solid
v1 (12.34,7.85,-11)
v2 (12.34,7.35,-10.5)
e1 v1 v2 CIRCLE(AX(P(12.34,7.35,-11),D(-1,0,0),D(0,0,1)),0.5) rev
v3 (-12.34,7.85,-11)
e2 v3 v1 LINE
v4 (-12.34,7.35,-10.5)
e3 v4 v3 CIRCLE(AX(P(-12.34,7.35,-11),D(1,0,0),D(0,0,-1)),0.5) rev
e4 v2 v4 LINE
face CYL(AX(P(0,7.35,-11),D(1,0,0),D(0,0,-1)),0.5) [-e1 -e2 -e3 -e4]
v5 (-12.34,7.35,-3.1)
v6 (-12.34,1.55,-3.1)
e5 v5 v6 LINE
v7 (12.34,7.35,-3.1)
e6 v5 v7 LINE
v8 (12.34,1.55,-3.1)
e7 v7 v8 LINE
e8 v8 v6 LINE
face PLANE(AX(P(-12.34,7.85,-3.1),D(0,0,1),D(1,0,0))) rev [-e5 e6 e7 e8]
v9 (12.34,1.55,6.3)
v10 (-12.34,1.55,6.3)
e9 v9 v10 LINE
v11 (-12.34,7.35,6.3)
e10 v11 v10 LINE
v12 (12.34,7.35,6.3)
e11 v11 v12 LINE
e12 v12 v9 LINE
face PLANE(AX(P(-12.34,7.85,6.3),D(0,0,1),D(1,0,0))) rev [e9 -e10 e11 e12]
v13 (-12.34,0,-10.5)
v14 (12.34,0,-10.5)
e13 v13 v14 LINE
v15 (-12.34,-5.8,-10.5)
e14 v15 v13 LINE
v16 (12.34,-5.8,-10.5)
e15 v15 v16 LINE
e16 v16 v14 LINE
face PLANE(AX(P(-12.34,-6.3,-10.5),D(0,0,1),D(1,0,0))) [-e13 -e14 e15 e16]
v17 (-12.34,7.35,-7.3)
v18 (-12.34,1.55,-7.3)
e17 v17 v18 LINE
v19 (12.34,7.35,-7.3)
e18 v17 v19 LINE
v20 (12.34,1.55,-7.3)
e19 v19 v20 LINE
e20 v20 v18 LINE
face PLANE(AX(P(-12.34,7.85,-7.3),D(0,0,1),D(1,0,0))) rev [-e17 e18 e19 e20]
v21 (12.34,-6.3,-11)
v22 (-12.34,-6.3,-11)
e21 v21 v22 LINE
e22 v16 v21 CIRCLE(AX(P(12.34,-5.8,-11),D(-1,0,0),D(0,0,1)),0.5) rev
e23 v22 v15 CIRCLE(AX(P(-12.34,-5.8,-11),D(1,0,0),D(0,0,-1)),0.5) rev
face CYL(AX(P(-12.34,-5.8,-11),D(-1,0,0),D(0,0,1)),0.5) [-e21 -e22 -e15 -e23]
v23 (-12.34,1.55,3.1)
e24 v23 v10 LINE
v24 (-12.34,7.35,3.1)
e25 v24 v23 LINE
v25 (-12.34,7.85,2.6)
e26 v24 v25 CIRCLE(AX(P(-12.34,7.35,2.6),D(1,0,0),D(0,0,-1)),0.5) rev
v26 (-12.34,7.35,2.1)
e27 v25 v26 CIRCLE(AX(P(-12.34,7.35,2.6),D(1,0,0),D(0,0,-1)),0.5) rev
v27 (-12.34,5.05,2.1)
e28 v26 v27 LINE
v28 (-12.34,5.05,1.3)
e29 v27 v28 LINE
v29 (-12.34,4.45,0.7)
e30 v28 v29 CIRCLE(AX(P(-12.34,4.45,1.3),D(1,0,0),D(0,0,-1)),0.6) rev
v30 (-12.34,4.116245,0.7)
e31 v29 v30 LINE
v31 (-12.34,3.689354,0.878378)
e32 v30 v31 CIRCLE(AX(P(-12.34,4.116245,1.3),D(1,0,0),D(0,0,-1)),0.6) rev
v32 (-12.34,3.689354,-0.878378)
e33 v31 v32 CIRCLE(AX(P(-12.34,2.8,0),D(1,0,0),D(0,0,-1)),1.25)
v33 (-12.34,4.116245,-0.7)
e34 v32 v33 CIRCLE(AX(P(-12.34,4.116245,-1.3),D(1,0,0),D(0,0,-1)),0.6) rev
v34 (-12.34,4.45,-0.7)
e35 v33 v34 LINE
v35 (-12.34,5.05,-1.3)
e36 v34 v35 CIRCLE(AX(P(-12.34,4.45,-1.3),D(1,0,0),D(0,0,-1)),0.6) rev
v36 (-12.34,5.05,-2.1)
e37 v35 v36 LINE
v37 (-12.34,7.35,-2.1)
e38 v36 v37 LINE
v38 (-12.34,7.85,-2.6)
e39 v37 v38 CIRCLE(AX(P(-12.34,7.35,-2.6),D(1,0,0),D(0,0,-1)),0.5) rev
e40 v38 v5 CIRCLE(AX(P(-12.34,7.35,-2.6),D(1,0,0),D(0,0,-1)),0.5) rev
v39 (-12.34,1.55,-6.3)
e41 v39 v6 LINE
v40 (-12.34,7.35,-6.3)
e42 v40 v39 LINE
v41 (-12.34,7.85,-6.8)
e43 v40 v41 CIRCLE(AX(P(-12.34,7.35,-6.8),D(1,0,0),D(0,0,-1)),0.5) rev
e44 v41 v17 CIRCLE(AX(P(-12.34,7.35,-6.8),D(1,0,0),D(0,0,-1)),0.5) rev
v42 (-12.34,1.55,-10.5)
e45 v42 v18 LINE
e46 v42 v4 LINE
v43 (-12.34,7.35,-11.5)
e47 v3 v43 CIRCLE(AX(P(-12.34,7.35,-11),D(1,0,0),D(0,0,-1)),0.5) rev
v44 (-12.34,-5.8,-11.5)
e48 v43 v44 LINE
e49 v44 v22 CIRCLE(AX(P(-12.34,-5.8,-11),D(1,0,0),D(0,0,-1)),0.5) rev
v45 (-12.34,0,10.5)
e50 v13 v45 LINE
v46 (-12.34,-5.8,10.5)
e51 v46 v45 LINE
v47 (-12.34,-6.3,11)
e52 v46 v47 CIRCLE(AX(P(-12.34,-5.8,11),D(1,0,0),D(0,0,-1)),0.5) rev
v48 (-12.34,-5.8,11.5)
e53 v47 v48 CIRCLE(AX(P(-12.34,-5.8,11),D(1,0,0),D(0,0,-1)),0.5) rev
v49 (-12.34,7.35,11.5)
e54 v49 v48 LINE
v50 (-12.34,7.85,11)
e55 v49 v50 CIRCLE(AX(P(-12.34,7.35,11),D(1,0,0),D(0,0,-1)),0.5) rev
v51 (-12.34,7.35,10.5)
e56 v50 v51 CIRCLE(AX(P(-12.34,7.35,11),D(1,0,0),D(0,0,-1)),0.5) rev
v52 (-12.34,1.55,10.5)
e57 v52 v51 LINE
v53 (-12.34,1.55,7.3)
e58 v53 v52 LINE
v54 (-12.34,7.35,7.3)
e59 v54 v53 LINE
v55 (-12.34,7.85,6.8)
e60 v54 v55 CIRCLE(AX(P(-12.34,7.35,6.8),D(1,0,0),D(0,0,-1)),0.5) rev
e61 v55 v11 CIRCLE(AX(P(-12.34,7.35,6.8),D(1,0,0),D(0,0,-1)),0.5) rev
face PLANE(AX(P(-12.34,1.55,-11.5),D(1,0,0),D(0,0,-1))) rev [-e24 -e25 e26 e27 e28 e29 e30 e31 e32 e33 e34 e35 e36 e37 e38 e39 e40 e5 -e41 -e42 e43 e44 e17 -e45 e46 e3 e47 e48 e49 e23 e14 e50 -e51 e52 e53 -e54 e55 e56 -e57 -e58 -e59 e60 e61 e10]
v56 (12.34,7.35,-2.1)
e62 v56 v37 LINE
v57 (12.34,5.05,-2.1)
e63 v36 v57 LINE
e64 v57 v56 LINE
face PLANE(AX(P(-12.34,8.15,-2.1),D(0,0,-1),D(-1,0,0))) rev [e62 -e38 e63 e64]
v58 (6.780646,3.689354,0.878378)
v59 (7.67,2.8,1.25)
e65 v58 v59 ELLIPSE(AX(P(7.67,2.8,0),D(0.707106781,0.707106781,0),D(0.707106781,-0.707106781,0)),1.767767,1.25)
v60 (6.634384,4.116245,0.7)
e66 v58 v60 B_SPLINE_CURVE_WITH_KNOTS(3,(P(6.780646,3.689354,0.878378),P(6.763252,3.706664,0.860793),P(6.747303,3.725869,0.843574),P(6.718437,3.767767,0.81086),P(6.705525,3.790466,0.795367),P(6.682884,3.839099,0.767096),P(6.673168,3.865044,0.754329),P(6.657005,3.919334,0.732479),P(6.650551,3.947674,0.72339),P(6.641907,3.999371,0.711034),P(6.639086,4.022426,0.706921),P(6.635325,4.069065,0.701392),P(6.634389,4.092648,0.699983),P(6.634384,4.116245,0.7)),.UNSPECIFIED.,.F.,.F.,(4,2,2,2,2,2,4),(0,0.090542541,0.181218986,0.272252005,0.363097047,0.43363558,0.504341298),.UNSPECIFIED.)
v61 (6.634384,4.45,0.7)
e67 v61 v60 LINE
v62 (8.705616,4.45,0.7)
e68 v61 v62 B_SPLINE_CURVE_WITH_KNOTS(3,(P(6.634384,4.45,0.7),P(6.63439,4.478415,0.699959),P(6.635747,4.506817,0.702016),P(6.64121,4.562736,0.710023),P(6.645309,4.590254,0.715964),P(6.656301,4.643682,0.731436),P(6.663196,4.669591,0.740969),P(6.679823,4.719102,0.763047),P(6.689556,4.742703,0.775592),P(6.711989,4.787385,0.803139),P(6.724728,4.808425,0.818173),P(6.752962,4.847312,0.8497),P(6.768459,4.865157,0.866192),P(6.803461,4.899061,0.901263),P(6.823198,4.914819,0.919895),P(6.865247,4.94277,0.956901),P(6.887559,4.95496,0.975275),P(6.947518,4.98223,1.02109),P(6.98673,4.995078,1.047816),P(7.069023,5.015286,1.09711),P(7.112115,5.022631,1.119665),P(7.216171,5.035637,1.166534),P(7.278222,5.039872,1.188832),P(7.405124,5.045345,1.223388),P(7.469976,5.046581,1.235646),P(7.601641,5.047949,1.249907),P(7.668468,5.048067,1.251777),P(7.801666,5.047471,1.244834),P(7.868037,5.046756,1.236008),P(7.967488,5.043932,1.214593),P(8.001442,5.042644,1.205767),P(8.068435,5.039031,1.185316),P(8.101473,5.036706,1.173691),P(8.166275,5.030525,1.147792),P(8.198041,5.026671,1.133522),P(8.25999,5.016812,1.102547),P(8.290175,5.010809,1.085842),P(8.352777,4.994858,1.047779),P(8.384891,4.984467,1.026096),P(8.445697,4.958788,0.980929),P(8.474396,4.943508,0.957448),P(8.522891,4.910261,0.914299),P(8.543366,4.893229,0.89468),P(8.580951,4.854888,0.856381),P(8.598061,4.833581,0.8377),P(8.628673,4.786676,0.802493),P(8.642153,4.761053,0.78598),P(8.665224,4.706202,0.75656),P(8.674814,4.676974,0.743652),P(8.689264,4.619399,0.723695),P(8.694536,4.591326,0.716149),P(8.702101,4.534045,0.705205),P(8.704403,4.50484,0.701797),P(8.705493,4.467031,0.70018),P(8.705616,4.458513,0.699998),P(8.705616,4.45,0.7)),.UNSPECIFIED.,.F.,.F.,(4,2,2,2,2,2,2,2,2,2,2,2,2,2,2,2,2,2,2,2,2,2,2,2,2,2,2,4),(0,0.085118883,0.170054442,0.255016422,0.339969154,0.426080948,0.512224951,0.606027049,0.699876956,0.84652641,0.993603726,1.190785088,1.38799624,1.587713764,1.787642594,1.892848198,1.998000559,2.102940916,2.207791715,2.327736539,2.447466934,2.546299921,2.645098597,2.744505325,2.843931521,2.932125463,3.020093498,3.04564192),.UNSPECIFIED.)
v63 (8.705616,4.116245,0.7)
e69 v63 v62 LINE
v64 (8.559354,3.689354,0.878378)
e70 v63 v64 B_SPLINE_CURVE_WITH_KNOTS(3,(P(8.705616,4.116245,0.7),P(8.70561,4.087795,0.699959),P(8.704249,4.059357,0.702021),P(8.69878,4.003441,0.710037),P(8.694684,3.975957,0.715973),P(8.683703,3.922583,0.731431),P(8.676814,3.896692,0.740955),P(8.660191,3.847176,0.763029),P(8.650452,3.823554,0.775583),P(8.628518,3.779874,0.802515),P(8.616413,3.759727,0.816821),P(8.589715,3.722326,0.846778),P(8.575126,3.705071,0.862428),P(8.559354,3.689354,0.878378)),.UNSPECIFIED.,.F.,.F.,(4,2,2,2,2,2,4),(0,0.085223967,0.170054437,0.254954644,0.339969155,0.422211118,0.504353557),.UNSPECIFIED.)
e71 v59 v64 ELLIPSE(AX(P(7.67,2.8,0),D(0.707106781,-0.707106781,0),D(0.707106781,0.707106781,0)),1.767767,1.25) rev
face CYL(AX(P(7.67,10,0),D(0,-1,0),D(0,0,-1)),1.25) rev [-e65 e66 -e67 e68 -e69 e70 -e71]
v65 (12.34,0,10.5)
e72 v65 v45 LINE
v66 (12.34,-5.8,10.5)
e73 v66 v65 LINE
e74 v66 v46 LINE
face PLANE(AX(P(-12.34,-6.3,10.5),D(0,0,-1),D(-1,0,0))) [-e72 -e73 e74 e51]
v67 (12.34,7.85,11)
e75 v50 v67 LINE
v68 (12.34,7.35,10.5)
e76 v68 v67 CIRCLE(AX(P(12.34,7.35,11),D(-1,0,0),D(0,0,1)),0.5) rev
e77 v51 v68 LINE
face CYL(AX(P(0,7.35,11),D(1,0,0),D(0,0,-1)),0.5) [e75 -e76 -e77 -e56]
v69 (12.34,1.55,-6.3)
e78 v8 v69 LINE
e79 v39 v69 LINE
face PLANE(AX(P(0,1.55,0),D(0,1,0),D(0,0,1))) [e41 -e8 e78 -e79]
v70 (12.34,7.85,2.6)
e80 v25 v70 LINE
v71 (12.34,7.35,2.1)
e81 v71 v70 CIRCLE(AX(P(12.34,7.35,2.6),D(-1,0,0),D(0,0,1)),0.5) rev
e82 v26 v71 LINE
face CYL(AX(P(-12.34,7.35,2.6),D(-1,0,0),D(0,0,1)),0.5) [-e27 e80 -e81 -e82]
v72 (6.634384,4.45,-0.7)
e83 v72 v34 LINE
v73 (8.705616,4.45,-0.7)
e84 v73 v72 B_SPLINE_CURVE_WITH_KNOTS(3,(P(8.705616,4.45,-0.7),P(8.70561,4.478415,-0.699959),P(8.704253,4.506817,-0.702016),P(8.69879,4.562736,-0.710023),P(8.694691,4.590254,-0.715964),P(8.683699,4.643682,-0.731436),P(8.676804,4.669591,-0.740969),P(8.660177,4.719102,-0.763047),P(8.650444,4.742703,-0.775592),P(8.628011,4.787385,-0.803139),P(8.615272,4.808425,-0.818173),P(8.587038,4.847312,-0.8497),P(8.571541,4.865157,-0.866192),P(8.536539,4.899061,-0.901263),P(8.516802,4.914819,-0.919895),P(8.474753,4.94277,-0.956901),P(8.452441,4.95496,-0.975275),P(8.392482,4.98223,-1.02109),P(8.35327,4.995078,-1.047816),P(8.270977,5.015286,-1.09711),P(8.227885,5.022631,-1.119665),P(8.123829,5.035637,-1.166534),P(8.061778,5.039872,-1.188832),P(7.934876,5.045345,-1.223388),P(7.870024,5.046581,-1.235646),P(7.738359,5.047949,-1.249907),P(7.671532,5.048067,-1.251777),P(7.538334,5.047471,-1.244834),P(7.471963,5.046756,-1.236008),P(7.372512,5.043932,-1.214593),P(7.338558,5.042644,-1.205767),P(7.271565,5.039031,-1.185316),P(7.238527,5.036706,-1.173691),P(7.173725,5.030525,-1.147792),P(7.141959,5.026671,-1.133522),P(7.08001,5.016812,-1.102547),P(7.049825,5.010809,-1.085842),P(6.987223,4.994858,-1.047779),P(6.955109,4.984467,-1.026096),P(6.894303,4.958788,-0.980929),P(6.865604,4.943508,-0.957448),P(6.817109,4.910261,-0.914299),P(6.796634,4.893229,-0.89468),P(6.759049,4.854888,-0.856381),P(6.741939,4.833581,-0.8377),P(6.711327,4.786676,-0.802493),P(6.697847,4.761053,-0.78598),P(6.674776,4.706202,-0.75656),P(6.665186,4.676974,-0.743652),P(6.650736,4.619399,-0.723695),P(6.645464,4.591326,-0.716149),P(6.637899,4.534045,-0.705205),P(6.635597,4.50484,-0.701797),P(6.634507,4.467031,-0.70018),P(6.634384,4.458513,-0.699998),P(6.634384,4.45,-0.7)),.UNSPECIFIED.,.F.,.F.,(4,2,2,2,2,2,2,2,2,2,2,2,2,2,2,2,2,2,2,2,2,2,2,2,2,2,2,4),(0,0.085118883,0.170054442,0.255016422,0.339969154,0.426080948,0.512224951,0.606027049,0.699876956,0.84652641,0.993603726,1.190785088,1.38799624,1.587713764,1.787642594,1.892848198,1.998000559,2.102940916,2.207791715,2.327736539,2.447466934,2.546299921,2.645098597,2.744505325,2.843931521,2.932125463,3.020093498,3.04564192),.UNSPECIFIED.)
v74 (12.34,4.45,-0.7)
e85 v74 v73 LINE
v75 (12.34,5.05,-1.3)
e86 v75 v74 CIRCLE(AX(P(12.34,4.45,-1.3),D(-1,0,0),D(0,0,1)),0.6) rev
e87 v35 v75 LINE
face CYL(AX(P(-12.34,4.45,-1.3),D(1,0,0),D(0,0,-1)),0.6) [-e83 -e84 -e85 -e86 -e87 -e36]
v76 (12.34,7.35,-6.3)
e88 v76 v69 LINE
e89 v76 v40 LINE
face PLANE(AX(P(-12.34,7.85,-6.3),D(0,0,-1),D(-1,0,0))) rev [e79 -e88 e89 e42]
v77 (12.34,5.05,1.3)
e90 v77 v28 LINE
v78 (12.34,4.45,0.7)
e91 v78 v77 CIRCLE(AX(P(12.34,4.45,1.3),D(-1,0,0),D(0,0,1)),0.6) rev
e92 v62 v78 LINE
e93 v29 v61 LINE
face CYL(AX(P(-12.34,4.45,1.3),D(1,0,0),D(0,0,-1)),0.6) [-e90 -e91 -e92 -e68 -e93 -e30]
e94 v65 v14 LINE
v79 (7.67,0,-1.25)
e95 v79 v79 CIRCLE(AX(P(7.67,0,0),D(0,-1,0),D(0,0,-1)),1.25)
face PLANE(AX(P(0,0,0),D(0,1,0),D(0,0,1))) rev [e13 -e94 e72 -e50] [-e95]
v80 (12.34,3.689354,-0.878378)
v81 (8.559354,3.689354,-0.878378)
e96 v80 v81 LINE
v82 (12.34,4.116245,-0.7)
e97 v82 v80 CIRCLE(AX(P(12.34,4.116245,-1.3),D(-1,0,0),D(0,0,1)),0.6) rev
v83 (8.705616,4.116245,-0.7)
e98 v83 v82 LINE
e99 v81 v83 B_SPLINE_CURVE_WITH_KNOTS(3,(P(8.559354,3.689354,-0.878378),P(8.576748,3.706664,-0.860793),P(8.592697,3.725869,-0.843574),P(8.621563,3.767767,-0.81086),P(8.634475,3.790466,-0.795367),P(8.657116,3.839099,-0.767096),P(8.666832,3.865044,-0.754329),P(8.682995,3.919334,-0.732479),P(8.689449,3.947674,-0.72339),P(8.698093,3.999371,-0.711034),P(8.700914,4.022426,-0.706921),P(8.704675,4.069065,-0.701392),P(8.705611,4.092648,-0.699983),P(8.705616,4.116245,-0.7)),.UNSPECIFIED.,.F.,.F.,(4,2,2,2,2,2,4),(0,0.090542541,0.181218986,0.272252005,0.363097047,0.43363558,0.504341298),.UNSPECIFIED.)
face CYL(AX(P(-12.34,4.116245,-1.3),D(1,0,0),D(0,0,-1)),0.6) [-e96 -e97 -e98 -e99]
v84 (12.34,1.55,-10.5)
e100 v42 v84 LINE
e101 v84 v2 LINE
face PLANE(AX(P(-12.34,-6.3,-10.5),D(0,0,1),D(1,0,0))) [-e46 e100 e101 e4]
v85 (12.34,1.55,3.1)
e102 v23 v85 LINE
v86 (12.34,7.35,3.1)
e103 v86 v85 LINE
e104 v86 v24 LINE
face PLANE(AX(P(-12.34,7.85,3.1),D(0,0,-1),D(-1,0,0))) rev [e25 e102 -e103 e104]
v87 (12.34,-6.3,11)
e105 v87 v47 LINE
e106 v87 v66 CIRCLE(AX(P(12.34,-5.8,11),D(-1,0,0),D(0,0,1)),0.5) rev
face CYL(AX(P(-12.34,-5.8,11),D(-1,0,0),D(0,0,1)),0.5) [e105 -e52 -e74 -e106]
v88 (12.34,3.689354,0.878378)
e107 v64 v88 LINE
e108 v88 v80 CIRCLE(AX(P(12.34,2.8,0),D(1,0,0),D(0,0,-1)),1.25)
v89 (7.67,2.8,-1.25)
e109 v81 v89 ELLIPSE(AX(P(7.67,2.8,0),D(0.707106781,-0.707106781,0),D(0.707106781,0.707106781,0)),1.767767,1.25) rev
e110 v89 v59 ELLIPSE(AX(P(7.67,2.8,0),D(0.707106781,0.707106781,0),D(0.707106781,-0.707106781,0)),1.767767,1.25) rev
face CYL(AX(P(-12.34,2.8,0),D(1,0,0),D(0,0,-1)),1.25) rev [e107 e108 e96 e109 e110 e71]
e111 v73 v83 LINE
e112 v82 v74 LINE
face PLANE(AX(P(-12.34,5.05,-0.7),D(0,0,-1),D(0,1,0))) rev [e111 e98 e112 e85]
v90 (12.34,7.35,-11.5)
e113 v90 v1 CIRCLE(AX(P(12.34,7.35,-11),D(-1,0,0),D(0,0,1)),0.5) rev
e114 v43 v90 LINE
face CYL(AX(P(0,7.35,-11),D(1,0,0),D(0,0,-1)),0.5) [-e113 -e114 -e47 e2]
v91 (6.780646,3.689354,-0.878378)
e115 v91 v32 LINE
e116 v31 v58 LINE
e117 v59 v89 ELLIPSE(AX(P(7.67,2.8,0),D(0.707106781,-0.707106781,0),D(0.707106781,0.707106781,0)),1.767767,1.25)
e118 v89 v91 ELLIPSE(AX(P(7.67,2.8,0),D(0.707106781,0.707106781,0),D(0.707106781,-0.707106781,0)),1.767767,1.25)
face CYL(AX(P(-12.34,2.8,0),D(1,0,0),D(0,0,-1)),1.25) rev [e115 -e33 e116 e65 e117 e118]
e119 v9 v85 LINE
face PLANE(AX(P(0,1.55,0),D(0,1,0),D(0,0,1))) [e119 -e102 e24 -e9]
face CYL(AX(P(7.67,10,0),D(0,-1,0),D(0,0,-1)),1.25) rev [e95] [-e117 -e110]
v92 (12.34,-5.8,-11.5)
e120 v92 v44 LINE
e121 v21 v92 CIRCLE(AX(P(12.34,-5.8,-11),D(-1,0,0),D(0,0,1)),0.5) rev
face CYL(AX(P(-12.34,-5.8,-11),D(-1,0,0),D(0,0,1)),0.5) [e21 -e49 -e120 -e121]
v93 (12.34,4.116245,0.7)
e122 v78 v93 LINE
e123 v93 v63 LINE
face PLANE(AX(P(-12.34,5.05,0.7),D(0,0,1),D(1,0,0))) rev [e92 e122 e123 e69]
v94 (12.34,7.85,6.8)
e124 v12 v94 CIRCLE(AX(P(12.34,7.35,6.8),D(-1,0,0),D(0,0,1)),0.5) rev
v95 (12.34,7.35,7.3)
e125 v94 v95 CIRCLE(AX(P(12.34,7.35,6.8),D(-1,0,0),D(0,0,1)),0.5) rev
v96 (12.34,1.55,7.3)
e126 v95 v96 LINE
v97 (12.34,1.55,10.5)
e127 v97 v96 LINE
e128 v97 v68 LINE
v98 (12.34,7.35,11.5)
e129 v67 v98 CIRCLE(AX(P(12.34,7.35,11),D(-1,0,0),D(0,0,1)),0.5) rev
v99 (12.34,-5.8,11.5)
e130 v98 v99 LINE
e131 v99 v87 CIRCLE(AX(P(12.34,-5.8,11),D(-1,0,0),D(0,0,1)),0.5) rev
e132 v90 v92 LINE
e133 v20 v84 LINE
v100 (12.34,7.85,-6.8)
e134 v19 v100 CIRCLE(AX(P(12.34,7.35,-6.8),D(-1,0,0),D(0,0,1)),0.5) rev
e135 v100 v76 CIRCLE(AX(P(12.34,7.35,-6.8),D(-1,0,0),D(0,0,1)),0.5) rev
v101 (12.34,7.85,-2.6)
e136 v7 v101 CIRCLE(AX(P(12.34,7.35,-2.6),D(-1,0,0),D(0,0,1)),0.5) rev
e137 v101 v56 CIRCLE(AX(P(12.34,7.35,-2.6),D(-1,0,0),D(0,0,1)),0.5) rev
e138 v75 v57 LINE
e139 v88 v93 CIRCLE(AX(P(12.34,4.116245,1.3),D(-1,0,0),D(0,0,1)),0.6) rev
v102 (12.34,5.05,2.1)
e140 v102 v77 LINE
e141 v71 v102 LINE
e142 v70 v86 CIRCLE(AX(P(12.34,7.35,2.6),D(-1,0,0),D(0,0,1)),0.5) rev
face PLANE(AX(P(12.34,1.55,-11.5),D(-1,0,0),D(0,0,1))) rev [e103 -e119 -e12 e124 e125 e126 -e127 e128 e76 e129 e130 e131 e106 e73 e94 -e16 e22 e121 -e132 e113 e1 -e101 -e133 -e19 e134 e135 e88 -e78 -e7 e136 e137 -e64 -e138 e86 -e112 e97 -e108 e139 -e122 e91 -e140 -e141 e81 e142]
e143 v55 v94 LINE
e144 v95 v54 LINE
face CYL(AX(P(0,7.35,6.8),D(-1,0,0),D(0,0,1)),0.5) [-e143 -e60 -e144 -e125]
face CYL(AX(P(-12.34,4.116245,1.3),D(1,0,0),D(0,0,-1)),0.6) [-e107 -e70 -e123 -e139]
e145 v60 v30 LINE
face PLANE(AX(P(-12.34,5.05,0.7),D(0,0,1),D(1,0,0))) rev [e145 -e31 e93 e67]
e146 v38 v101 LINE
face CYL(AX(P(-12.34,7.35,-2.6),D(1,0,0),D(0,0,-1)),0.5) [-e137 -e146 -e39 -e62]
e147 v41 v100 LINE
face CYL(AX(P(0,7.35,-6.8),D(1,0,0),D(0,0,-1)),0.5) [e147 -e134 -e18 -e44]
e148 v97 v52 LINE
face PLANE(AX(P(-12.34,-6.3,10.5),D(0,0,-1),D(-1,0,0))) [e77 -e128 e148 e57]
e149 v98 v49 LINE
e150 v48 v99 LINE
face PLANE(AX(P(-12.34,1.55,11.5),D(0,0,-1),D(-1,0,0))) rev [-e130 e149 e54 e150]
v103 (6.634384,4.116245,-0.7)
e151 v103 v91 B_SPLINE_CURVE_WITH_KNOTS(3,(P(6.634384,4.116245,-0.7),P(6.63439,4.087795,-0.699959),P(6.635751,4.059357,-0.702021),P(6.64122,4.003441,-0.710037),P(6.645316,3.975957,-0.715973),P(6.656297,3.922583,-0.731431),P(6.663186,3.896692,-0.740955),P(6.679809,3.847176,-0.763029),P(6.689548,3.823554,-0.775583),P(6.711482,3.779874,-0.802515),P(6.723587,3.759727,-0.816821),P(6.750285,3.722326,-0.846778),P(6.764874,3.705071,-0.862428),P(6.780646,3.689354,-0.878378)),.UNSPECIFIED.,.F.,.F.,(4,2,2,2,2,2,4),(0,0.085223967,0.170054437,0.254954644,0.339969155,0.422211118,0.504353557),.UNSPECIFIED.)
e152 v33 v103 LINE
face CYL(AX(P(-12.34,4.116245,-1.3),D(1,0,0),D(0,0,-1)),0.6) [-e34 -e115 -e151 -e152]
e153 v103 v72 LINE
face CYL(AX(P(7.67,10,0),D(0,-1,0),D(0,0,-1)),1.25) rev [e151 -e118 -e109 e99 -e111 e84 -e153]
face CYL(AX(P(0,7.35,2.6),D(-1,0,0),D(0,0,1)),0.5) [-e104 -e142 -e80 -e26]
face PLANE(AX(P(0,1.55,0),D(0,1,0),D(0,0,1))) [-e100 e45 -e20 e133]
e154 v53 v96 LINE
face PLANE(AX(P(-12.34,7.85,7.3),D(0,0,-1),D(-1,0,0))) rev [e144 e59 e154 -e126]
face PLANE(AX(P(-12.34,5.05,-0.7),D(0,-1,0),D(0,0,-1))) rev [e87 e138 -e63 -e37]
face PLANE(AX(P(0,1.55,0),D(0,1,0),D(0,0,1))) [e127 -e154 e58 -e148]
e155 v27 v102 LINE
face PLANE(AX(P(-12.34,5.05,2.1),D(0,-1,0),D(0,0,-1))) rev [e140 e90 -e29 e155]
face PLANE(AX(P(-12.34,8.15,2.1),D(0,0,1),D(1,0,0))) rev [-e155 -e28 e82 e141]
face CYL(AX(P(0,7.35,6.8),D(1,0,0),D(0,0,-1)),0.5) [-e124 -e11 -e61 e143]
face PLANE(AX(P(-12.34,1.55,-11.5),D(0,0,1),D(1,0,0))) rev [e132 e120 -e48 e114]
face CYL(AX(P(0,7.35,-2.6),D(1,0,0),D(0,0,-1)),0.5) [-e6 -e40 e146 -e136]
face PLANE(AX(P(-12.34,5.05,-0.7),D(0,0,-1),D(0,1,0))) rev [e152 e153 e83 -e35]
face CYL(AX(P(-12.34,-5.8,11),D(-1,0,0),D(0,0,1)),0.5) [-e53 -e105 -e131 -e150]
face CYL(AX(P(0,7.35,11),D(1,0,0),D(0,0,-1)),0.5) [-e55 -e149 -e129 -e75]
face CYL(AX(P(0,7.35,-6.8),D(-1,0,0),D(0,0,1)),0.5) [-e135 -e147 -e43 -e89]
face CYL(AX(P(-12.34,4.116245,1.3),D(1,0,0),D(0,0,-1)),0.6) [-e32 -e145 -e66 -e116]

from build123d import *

# Parameters (mm, degrees)
SKETCH1_W                = 24.68
SKETCH1_H                = 23
BOSS_EXTRUDE1_DEPTH      = 1.55
BOSS_EXTRUDE2_DEPTH      = 6.3
BOSS_EXTRUDE2_DEPTH_BACK = 7.85
SKETCH2_W                = 24.68
SKETCH2_H                = 1
SKETCH3_W                = 24.68
SKETCH3_H                = 1
BOSS_EXTRUDE3_DEPTH      = 6.3
SKETCH4_W                = 24.68
SKETCH4_H                = 6.2
BOSS_EXTRUDE4_DEPTH      = 6.3
CUT_EXTRUDE1_DEPTH       = 29.336811747
FILLET1_R                = 0.5
FILLET2_R                = 0.6
SKETCH6_R                = 1.25
CUT_EXTRUDE2_DEPTH       = 10


with BuildPart() as part:
    # Sketch1 → Boss-Extrude1 (new body)
    with BuildSketch(Plane(origin=(0, 0, 0), x_dir=(1, 0, 0), z_dir=(0, 1, 0))):
        Rectangle(SKETCH1_W, SKETCH1_H)
    extrude(amount=BOSS_EXTRUDE1_DEPTH)

    # Sketch2 → Boss-Extrude2 (add, two sides: drawn at the far end of the back side and taken through both)
    with BuildSketch(Plane(origin=(0, 1.55, 0), x_dir=(1, 0, 0), z_dir=(0, 1, 0)).offset(-BOSS_EXTRUDE2_DEPTH_BACK)):
        with Locations((0, 11)):
            Rectangle(SKETCH2_W, SKETCH2_H)
        with Locations((0, -11)):
            Rectangle(SKETCH2_W, SKETCH2_H)
    extrude(amount=BOSS_EXTRUDE2_DEPTH + BOSS_EXTRUDE2_DEPTH_BACK)

    # Sketch3 → Boss-Extrude3 (add)
    with BuildSketch(Plane(origin=(0, 1.55, 0), x_dir=(1, 0, 0), z_dir=(0, 1, 0))):
        with Locations((0, 6.8)):
            Rectangle(SKETCH3_W, SKETCH3_H)
        with Locations((0, -6.8)):
            Rectangle(SKETCH3_W, SKETCH3_H)
    extrude(amount=BOSS_EXTRUDE3_DEPTH)

    # Sketch4 → Boss-Extrude4 (add)
    with BuildSketch(Plane(origin=(0, 1.55, 0), x_dir=(1, 0, 0), z_dir=(0, 1, 0))):
        Rectangle(SKETCH4_W, SKETCH4_H)
    extrude(amount=BOSS_EXTRUDE4_DEPTH)

    # Sketch5 → Cut-Extrude1 (cut, through all)
    with BuildSketch(Plane(origin=(12.34, 0, 0), x_dir=(0, 0, -1), z_dir=(1, 0, 0))):
        with BuildLine():
            Line((-2.1, 5.05), (-0.7, 5.05))
            Line((-0.7, 5.05), (-0.7, 3.835615759))
            ThreePointArc((-0.7, 3.835615759), (0, 1.55), (0.7, 3.835615759))
            Line((0.7, 3.835615759), (0.7, 5.05))
            Line((0.7, 5.05), (2.1, 5.05))
            Line((2.1, 5.05), (2.1, 8.15))
            Line((2.1, 8.15), (-2.1, 8.15))
            Line((-2.1, 8.15), (-2.1, 5.05))
        make_face()
    extrude(amount=-CUT_EXTRUDE1_DEPTH, mode=Mode.SUBTRACT)

    # Fillet1
    fillet1_edges = [part.edges().sort_by_distance(p)[0] for p in [
        (0, -6.3, -11.5),
        (0, -6.3, -10.5),
        (0, -6.3, 10.5),
        (0, -6.3, 11.5),
        (0, 7.85, -11.5),
        (0, 7.85, -10.5),
        (0, 7.85, -7.3),
        (0, 7.85, -6.3),
        (0, 7.85, -3.1),
        (0, 7.85, -2.1),
        (0, 7.85, 2.1),
        (0, 7.85, 3.1),
        (0, 7.85, 6.3),
        (0, 7.85, 7.3),
        (0, 7.85, 10.5),
        (0, 7.85, 11.5),
    ]]
    fillet(fillet1_edges, radius=FILLET1_R - 0.0001)  # a hair under: the kernel refuses the full size

    # Fillet2
    fillet2_edges = [part.edges().sort_by_distance(p)[0] for p in [
        (0, 3.835615759, -0.7),
        (0, 3.835615759, 0.7),
        (0, 5.05, 0.7),
        (0, 5.05, -0.7),
    ]]
    fillet(fillet2_edges, radius=FILLET2_R)

    # Sketch6 → Cut-Extrude2 (cut)
    with BuildSketch(Plane.XZ):
        with Locations(Location((7.67, 0, 0), (0, 0, 270))):
            Circle(SKETCH6_R)
    extrude(amount=-CUT_EXTRUDE2_DEPTH, mode=Mode.SUBTRACT)


solid = part.part
